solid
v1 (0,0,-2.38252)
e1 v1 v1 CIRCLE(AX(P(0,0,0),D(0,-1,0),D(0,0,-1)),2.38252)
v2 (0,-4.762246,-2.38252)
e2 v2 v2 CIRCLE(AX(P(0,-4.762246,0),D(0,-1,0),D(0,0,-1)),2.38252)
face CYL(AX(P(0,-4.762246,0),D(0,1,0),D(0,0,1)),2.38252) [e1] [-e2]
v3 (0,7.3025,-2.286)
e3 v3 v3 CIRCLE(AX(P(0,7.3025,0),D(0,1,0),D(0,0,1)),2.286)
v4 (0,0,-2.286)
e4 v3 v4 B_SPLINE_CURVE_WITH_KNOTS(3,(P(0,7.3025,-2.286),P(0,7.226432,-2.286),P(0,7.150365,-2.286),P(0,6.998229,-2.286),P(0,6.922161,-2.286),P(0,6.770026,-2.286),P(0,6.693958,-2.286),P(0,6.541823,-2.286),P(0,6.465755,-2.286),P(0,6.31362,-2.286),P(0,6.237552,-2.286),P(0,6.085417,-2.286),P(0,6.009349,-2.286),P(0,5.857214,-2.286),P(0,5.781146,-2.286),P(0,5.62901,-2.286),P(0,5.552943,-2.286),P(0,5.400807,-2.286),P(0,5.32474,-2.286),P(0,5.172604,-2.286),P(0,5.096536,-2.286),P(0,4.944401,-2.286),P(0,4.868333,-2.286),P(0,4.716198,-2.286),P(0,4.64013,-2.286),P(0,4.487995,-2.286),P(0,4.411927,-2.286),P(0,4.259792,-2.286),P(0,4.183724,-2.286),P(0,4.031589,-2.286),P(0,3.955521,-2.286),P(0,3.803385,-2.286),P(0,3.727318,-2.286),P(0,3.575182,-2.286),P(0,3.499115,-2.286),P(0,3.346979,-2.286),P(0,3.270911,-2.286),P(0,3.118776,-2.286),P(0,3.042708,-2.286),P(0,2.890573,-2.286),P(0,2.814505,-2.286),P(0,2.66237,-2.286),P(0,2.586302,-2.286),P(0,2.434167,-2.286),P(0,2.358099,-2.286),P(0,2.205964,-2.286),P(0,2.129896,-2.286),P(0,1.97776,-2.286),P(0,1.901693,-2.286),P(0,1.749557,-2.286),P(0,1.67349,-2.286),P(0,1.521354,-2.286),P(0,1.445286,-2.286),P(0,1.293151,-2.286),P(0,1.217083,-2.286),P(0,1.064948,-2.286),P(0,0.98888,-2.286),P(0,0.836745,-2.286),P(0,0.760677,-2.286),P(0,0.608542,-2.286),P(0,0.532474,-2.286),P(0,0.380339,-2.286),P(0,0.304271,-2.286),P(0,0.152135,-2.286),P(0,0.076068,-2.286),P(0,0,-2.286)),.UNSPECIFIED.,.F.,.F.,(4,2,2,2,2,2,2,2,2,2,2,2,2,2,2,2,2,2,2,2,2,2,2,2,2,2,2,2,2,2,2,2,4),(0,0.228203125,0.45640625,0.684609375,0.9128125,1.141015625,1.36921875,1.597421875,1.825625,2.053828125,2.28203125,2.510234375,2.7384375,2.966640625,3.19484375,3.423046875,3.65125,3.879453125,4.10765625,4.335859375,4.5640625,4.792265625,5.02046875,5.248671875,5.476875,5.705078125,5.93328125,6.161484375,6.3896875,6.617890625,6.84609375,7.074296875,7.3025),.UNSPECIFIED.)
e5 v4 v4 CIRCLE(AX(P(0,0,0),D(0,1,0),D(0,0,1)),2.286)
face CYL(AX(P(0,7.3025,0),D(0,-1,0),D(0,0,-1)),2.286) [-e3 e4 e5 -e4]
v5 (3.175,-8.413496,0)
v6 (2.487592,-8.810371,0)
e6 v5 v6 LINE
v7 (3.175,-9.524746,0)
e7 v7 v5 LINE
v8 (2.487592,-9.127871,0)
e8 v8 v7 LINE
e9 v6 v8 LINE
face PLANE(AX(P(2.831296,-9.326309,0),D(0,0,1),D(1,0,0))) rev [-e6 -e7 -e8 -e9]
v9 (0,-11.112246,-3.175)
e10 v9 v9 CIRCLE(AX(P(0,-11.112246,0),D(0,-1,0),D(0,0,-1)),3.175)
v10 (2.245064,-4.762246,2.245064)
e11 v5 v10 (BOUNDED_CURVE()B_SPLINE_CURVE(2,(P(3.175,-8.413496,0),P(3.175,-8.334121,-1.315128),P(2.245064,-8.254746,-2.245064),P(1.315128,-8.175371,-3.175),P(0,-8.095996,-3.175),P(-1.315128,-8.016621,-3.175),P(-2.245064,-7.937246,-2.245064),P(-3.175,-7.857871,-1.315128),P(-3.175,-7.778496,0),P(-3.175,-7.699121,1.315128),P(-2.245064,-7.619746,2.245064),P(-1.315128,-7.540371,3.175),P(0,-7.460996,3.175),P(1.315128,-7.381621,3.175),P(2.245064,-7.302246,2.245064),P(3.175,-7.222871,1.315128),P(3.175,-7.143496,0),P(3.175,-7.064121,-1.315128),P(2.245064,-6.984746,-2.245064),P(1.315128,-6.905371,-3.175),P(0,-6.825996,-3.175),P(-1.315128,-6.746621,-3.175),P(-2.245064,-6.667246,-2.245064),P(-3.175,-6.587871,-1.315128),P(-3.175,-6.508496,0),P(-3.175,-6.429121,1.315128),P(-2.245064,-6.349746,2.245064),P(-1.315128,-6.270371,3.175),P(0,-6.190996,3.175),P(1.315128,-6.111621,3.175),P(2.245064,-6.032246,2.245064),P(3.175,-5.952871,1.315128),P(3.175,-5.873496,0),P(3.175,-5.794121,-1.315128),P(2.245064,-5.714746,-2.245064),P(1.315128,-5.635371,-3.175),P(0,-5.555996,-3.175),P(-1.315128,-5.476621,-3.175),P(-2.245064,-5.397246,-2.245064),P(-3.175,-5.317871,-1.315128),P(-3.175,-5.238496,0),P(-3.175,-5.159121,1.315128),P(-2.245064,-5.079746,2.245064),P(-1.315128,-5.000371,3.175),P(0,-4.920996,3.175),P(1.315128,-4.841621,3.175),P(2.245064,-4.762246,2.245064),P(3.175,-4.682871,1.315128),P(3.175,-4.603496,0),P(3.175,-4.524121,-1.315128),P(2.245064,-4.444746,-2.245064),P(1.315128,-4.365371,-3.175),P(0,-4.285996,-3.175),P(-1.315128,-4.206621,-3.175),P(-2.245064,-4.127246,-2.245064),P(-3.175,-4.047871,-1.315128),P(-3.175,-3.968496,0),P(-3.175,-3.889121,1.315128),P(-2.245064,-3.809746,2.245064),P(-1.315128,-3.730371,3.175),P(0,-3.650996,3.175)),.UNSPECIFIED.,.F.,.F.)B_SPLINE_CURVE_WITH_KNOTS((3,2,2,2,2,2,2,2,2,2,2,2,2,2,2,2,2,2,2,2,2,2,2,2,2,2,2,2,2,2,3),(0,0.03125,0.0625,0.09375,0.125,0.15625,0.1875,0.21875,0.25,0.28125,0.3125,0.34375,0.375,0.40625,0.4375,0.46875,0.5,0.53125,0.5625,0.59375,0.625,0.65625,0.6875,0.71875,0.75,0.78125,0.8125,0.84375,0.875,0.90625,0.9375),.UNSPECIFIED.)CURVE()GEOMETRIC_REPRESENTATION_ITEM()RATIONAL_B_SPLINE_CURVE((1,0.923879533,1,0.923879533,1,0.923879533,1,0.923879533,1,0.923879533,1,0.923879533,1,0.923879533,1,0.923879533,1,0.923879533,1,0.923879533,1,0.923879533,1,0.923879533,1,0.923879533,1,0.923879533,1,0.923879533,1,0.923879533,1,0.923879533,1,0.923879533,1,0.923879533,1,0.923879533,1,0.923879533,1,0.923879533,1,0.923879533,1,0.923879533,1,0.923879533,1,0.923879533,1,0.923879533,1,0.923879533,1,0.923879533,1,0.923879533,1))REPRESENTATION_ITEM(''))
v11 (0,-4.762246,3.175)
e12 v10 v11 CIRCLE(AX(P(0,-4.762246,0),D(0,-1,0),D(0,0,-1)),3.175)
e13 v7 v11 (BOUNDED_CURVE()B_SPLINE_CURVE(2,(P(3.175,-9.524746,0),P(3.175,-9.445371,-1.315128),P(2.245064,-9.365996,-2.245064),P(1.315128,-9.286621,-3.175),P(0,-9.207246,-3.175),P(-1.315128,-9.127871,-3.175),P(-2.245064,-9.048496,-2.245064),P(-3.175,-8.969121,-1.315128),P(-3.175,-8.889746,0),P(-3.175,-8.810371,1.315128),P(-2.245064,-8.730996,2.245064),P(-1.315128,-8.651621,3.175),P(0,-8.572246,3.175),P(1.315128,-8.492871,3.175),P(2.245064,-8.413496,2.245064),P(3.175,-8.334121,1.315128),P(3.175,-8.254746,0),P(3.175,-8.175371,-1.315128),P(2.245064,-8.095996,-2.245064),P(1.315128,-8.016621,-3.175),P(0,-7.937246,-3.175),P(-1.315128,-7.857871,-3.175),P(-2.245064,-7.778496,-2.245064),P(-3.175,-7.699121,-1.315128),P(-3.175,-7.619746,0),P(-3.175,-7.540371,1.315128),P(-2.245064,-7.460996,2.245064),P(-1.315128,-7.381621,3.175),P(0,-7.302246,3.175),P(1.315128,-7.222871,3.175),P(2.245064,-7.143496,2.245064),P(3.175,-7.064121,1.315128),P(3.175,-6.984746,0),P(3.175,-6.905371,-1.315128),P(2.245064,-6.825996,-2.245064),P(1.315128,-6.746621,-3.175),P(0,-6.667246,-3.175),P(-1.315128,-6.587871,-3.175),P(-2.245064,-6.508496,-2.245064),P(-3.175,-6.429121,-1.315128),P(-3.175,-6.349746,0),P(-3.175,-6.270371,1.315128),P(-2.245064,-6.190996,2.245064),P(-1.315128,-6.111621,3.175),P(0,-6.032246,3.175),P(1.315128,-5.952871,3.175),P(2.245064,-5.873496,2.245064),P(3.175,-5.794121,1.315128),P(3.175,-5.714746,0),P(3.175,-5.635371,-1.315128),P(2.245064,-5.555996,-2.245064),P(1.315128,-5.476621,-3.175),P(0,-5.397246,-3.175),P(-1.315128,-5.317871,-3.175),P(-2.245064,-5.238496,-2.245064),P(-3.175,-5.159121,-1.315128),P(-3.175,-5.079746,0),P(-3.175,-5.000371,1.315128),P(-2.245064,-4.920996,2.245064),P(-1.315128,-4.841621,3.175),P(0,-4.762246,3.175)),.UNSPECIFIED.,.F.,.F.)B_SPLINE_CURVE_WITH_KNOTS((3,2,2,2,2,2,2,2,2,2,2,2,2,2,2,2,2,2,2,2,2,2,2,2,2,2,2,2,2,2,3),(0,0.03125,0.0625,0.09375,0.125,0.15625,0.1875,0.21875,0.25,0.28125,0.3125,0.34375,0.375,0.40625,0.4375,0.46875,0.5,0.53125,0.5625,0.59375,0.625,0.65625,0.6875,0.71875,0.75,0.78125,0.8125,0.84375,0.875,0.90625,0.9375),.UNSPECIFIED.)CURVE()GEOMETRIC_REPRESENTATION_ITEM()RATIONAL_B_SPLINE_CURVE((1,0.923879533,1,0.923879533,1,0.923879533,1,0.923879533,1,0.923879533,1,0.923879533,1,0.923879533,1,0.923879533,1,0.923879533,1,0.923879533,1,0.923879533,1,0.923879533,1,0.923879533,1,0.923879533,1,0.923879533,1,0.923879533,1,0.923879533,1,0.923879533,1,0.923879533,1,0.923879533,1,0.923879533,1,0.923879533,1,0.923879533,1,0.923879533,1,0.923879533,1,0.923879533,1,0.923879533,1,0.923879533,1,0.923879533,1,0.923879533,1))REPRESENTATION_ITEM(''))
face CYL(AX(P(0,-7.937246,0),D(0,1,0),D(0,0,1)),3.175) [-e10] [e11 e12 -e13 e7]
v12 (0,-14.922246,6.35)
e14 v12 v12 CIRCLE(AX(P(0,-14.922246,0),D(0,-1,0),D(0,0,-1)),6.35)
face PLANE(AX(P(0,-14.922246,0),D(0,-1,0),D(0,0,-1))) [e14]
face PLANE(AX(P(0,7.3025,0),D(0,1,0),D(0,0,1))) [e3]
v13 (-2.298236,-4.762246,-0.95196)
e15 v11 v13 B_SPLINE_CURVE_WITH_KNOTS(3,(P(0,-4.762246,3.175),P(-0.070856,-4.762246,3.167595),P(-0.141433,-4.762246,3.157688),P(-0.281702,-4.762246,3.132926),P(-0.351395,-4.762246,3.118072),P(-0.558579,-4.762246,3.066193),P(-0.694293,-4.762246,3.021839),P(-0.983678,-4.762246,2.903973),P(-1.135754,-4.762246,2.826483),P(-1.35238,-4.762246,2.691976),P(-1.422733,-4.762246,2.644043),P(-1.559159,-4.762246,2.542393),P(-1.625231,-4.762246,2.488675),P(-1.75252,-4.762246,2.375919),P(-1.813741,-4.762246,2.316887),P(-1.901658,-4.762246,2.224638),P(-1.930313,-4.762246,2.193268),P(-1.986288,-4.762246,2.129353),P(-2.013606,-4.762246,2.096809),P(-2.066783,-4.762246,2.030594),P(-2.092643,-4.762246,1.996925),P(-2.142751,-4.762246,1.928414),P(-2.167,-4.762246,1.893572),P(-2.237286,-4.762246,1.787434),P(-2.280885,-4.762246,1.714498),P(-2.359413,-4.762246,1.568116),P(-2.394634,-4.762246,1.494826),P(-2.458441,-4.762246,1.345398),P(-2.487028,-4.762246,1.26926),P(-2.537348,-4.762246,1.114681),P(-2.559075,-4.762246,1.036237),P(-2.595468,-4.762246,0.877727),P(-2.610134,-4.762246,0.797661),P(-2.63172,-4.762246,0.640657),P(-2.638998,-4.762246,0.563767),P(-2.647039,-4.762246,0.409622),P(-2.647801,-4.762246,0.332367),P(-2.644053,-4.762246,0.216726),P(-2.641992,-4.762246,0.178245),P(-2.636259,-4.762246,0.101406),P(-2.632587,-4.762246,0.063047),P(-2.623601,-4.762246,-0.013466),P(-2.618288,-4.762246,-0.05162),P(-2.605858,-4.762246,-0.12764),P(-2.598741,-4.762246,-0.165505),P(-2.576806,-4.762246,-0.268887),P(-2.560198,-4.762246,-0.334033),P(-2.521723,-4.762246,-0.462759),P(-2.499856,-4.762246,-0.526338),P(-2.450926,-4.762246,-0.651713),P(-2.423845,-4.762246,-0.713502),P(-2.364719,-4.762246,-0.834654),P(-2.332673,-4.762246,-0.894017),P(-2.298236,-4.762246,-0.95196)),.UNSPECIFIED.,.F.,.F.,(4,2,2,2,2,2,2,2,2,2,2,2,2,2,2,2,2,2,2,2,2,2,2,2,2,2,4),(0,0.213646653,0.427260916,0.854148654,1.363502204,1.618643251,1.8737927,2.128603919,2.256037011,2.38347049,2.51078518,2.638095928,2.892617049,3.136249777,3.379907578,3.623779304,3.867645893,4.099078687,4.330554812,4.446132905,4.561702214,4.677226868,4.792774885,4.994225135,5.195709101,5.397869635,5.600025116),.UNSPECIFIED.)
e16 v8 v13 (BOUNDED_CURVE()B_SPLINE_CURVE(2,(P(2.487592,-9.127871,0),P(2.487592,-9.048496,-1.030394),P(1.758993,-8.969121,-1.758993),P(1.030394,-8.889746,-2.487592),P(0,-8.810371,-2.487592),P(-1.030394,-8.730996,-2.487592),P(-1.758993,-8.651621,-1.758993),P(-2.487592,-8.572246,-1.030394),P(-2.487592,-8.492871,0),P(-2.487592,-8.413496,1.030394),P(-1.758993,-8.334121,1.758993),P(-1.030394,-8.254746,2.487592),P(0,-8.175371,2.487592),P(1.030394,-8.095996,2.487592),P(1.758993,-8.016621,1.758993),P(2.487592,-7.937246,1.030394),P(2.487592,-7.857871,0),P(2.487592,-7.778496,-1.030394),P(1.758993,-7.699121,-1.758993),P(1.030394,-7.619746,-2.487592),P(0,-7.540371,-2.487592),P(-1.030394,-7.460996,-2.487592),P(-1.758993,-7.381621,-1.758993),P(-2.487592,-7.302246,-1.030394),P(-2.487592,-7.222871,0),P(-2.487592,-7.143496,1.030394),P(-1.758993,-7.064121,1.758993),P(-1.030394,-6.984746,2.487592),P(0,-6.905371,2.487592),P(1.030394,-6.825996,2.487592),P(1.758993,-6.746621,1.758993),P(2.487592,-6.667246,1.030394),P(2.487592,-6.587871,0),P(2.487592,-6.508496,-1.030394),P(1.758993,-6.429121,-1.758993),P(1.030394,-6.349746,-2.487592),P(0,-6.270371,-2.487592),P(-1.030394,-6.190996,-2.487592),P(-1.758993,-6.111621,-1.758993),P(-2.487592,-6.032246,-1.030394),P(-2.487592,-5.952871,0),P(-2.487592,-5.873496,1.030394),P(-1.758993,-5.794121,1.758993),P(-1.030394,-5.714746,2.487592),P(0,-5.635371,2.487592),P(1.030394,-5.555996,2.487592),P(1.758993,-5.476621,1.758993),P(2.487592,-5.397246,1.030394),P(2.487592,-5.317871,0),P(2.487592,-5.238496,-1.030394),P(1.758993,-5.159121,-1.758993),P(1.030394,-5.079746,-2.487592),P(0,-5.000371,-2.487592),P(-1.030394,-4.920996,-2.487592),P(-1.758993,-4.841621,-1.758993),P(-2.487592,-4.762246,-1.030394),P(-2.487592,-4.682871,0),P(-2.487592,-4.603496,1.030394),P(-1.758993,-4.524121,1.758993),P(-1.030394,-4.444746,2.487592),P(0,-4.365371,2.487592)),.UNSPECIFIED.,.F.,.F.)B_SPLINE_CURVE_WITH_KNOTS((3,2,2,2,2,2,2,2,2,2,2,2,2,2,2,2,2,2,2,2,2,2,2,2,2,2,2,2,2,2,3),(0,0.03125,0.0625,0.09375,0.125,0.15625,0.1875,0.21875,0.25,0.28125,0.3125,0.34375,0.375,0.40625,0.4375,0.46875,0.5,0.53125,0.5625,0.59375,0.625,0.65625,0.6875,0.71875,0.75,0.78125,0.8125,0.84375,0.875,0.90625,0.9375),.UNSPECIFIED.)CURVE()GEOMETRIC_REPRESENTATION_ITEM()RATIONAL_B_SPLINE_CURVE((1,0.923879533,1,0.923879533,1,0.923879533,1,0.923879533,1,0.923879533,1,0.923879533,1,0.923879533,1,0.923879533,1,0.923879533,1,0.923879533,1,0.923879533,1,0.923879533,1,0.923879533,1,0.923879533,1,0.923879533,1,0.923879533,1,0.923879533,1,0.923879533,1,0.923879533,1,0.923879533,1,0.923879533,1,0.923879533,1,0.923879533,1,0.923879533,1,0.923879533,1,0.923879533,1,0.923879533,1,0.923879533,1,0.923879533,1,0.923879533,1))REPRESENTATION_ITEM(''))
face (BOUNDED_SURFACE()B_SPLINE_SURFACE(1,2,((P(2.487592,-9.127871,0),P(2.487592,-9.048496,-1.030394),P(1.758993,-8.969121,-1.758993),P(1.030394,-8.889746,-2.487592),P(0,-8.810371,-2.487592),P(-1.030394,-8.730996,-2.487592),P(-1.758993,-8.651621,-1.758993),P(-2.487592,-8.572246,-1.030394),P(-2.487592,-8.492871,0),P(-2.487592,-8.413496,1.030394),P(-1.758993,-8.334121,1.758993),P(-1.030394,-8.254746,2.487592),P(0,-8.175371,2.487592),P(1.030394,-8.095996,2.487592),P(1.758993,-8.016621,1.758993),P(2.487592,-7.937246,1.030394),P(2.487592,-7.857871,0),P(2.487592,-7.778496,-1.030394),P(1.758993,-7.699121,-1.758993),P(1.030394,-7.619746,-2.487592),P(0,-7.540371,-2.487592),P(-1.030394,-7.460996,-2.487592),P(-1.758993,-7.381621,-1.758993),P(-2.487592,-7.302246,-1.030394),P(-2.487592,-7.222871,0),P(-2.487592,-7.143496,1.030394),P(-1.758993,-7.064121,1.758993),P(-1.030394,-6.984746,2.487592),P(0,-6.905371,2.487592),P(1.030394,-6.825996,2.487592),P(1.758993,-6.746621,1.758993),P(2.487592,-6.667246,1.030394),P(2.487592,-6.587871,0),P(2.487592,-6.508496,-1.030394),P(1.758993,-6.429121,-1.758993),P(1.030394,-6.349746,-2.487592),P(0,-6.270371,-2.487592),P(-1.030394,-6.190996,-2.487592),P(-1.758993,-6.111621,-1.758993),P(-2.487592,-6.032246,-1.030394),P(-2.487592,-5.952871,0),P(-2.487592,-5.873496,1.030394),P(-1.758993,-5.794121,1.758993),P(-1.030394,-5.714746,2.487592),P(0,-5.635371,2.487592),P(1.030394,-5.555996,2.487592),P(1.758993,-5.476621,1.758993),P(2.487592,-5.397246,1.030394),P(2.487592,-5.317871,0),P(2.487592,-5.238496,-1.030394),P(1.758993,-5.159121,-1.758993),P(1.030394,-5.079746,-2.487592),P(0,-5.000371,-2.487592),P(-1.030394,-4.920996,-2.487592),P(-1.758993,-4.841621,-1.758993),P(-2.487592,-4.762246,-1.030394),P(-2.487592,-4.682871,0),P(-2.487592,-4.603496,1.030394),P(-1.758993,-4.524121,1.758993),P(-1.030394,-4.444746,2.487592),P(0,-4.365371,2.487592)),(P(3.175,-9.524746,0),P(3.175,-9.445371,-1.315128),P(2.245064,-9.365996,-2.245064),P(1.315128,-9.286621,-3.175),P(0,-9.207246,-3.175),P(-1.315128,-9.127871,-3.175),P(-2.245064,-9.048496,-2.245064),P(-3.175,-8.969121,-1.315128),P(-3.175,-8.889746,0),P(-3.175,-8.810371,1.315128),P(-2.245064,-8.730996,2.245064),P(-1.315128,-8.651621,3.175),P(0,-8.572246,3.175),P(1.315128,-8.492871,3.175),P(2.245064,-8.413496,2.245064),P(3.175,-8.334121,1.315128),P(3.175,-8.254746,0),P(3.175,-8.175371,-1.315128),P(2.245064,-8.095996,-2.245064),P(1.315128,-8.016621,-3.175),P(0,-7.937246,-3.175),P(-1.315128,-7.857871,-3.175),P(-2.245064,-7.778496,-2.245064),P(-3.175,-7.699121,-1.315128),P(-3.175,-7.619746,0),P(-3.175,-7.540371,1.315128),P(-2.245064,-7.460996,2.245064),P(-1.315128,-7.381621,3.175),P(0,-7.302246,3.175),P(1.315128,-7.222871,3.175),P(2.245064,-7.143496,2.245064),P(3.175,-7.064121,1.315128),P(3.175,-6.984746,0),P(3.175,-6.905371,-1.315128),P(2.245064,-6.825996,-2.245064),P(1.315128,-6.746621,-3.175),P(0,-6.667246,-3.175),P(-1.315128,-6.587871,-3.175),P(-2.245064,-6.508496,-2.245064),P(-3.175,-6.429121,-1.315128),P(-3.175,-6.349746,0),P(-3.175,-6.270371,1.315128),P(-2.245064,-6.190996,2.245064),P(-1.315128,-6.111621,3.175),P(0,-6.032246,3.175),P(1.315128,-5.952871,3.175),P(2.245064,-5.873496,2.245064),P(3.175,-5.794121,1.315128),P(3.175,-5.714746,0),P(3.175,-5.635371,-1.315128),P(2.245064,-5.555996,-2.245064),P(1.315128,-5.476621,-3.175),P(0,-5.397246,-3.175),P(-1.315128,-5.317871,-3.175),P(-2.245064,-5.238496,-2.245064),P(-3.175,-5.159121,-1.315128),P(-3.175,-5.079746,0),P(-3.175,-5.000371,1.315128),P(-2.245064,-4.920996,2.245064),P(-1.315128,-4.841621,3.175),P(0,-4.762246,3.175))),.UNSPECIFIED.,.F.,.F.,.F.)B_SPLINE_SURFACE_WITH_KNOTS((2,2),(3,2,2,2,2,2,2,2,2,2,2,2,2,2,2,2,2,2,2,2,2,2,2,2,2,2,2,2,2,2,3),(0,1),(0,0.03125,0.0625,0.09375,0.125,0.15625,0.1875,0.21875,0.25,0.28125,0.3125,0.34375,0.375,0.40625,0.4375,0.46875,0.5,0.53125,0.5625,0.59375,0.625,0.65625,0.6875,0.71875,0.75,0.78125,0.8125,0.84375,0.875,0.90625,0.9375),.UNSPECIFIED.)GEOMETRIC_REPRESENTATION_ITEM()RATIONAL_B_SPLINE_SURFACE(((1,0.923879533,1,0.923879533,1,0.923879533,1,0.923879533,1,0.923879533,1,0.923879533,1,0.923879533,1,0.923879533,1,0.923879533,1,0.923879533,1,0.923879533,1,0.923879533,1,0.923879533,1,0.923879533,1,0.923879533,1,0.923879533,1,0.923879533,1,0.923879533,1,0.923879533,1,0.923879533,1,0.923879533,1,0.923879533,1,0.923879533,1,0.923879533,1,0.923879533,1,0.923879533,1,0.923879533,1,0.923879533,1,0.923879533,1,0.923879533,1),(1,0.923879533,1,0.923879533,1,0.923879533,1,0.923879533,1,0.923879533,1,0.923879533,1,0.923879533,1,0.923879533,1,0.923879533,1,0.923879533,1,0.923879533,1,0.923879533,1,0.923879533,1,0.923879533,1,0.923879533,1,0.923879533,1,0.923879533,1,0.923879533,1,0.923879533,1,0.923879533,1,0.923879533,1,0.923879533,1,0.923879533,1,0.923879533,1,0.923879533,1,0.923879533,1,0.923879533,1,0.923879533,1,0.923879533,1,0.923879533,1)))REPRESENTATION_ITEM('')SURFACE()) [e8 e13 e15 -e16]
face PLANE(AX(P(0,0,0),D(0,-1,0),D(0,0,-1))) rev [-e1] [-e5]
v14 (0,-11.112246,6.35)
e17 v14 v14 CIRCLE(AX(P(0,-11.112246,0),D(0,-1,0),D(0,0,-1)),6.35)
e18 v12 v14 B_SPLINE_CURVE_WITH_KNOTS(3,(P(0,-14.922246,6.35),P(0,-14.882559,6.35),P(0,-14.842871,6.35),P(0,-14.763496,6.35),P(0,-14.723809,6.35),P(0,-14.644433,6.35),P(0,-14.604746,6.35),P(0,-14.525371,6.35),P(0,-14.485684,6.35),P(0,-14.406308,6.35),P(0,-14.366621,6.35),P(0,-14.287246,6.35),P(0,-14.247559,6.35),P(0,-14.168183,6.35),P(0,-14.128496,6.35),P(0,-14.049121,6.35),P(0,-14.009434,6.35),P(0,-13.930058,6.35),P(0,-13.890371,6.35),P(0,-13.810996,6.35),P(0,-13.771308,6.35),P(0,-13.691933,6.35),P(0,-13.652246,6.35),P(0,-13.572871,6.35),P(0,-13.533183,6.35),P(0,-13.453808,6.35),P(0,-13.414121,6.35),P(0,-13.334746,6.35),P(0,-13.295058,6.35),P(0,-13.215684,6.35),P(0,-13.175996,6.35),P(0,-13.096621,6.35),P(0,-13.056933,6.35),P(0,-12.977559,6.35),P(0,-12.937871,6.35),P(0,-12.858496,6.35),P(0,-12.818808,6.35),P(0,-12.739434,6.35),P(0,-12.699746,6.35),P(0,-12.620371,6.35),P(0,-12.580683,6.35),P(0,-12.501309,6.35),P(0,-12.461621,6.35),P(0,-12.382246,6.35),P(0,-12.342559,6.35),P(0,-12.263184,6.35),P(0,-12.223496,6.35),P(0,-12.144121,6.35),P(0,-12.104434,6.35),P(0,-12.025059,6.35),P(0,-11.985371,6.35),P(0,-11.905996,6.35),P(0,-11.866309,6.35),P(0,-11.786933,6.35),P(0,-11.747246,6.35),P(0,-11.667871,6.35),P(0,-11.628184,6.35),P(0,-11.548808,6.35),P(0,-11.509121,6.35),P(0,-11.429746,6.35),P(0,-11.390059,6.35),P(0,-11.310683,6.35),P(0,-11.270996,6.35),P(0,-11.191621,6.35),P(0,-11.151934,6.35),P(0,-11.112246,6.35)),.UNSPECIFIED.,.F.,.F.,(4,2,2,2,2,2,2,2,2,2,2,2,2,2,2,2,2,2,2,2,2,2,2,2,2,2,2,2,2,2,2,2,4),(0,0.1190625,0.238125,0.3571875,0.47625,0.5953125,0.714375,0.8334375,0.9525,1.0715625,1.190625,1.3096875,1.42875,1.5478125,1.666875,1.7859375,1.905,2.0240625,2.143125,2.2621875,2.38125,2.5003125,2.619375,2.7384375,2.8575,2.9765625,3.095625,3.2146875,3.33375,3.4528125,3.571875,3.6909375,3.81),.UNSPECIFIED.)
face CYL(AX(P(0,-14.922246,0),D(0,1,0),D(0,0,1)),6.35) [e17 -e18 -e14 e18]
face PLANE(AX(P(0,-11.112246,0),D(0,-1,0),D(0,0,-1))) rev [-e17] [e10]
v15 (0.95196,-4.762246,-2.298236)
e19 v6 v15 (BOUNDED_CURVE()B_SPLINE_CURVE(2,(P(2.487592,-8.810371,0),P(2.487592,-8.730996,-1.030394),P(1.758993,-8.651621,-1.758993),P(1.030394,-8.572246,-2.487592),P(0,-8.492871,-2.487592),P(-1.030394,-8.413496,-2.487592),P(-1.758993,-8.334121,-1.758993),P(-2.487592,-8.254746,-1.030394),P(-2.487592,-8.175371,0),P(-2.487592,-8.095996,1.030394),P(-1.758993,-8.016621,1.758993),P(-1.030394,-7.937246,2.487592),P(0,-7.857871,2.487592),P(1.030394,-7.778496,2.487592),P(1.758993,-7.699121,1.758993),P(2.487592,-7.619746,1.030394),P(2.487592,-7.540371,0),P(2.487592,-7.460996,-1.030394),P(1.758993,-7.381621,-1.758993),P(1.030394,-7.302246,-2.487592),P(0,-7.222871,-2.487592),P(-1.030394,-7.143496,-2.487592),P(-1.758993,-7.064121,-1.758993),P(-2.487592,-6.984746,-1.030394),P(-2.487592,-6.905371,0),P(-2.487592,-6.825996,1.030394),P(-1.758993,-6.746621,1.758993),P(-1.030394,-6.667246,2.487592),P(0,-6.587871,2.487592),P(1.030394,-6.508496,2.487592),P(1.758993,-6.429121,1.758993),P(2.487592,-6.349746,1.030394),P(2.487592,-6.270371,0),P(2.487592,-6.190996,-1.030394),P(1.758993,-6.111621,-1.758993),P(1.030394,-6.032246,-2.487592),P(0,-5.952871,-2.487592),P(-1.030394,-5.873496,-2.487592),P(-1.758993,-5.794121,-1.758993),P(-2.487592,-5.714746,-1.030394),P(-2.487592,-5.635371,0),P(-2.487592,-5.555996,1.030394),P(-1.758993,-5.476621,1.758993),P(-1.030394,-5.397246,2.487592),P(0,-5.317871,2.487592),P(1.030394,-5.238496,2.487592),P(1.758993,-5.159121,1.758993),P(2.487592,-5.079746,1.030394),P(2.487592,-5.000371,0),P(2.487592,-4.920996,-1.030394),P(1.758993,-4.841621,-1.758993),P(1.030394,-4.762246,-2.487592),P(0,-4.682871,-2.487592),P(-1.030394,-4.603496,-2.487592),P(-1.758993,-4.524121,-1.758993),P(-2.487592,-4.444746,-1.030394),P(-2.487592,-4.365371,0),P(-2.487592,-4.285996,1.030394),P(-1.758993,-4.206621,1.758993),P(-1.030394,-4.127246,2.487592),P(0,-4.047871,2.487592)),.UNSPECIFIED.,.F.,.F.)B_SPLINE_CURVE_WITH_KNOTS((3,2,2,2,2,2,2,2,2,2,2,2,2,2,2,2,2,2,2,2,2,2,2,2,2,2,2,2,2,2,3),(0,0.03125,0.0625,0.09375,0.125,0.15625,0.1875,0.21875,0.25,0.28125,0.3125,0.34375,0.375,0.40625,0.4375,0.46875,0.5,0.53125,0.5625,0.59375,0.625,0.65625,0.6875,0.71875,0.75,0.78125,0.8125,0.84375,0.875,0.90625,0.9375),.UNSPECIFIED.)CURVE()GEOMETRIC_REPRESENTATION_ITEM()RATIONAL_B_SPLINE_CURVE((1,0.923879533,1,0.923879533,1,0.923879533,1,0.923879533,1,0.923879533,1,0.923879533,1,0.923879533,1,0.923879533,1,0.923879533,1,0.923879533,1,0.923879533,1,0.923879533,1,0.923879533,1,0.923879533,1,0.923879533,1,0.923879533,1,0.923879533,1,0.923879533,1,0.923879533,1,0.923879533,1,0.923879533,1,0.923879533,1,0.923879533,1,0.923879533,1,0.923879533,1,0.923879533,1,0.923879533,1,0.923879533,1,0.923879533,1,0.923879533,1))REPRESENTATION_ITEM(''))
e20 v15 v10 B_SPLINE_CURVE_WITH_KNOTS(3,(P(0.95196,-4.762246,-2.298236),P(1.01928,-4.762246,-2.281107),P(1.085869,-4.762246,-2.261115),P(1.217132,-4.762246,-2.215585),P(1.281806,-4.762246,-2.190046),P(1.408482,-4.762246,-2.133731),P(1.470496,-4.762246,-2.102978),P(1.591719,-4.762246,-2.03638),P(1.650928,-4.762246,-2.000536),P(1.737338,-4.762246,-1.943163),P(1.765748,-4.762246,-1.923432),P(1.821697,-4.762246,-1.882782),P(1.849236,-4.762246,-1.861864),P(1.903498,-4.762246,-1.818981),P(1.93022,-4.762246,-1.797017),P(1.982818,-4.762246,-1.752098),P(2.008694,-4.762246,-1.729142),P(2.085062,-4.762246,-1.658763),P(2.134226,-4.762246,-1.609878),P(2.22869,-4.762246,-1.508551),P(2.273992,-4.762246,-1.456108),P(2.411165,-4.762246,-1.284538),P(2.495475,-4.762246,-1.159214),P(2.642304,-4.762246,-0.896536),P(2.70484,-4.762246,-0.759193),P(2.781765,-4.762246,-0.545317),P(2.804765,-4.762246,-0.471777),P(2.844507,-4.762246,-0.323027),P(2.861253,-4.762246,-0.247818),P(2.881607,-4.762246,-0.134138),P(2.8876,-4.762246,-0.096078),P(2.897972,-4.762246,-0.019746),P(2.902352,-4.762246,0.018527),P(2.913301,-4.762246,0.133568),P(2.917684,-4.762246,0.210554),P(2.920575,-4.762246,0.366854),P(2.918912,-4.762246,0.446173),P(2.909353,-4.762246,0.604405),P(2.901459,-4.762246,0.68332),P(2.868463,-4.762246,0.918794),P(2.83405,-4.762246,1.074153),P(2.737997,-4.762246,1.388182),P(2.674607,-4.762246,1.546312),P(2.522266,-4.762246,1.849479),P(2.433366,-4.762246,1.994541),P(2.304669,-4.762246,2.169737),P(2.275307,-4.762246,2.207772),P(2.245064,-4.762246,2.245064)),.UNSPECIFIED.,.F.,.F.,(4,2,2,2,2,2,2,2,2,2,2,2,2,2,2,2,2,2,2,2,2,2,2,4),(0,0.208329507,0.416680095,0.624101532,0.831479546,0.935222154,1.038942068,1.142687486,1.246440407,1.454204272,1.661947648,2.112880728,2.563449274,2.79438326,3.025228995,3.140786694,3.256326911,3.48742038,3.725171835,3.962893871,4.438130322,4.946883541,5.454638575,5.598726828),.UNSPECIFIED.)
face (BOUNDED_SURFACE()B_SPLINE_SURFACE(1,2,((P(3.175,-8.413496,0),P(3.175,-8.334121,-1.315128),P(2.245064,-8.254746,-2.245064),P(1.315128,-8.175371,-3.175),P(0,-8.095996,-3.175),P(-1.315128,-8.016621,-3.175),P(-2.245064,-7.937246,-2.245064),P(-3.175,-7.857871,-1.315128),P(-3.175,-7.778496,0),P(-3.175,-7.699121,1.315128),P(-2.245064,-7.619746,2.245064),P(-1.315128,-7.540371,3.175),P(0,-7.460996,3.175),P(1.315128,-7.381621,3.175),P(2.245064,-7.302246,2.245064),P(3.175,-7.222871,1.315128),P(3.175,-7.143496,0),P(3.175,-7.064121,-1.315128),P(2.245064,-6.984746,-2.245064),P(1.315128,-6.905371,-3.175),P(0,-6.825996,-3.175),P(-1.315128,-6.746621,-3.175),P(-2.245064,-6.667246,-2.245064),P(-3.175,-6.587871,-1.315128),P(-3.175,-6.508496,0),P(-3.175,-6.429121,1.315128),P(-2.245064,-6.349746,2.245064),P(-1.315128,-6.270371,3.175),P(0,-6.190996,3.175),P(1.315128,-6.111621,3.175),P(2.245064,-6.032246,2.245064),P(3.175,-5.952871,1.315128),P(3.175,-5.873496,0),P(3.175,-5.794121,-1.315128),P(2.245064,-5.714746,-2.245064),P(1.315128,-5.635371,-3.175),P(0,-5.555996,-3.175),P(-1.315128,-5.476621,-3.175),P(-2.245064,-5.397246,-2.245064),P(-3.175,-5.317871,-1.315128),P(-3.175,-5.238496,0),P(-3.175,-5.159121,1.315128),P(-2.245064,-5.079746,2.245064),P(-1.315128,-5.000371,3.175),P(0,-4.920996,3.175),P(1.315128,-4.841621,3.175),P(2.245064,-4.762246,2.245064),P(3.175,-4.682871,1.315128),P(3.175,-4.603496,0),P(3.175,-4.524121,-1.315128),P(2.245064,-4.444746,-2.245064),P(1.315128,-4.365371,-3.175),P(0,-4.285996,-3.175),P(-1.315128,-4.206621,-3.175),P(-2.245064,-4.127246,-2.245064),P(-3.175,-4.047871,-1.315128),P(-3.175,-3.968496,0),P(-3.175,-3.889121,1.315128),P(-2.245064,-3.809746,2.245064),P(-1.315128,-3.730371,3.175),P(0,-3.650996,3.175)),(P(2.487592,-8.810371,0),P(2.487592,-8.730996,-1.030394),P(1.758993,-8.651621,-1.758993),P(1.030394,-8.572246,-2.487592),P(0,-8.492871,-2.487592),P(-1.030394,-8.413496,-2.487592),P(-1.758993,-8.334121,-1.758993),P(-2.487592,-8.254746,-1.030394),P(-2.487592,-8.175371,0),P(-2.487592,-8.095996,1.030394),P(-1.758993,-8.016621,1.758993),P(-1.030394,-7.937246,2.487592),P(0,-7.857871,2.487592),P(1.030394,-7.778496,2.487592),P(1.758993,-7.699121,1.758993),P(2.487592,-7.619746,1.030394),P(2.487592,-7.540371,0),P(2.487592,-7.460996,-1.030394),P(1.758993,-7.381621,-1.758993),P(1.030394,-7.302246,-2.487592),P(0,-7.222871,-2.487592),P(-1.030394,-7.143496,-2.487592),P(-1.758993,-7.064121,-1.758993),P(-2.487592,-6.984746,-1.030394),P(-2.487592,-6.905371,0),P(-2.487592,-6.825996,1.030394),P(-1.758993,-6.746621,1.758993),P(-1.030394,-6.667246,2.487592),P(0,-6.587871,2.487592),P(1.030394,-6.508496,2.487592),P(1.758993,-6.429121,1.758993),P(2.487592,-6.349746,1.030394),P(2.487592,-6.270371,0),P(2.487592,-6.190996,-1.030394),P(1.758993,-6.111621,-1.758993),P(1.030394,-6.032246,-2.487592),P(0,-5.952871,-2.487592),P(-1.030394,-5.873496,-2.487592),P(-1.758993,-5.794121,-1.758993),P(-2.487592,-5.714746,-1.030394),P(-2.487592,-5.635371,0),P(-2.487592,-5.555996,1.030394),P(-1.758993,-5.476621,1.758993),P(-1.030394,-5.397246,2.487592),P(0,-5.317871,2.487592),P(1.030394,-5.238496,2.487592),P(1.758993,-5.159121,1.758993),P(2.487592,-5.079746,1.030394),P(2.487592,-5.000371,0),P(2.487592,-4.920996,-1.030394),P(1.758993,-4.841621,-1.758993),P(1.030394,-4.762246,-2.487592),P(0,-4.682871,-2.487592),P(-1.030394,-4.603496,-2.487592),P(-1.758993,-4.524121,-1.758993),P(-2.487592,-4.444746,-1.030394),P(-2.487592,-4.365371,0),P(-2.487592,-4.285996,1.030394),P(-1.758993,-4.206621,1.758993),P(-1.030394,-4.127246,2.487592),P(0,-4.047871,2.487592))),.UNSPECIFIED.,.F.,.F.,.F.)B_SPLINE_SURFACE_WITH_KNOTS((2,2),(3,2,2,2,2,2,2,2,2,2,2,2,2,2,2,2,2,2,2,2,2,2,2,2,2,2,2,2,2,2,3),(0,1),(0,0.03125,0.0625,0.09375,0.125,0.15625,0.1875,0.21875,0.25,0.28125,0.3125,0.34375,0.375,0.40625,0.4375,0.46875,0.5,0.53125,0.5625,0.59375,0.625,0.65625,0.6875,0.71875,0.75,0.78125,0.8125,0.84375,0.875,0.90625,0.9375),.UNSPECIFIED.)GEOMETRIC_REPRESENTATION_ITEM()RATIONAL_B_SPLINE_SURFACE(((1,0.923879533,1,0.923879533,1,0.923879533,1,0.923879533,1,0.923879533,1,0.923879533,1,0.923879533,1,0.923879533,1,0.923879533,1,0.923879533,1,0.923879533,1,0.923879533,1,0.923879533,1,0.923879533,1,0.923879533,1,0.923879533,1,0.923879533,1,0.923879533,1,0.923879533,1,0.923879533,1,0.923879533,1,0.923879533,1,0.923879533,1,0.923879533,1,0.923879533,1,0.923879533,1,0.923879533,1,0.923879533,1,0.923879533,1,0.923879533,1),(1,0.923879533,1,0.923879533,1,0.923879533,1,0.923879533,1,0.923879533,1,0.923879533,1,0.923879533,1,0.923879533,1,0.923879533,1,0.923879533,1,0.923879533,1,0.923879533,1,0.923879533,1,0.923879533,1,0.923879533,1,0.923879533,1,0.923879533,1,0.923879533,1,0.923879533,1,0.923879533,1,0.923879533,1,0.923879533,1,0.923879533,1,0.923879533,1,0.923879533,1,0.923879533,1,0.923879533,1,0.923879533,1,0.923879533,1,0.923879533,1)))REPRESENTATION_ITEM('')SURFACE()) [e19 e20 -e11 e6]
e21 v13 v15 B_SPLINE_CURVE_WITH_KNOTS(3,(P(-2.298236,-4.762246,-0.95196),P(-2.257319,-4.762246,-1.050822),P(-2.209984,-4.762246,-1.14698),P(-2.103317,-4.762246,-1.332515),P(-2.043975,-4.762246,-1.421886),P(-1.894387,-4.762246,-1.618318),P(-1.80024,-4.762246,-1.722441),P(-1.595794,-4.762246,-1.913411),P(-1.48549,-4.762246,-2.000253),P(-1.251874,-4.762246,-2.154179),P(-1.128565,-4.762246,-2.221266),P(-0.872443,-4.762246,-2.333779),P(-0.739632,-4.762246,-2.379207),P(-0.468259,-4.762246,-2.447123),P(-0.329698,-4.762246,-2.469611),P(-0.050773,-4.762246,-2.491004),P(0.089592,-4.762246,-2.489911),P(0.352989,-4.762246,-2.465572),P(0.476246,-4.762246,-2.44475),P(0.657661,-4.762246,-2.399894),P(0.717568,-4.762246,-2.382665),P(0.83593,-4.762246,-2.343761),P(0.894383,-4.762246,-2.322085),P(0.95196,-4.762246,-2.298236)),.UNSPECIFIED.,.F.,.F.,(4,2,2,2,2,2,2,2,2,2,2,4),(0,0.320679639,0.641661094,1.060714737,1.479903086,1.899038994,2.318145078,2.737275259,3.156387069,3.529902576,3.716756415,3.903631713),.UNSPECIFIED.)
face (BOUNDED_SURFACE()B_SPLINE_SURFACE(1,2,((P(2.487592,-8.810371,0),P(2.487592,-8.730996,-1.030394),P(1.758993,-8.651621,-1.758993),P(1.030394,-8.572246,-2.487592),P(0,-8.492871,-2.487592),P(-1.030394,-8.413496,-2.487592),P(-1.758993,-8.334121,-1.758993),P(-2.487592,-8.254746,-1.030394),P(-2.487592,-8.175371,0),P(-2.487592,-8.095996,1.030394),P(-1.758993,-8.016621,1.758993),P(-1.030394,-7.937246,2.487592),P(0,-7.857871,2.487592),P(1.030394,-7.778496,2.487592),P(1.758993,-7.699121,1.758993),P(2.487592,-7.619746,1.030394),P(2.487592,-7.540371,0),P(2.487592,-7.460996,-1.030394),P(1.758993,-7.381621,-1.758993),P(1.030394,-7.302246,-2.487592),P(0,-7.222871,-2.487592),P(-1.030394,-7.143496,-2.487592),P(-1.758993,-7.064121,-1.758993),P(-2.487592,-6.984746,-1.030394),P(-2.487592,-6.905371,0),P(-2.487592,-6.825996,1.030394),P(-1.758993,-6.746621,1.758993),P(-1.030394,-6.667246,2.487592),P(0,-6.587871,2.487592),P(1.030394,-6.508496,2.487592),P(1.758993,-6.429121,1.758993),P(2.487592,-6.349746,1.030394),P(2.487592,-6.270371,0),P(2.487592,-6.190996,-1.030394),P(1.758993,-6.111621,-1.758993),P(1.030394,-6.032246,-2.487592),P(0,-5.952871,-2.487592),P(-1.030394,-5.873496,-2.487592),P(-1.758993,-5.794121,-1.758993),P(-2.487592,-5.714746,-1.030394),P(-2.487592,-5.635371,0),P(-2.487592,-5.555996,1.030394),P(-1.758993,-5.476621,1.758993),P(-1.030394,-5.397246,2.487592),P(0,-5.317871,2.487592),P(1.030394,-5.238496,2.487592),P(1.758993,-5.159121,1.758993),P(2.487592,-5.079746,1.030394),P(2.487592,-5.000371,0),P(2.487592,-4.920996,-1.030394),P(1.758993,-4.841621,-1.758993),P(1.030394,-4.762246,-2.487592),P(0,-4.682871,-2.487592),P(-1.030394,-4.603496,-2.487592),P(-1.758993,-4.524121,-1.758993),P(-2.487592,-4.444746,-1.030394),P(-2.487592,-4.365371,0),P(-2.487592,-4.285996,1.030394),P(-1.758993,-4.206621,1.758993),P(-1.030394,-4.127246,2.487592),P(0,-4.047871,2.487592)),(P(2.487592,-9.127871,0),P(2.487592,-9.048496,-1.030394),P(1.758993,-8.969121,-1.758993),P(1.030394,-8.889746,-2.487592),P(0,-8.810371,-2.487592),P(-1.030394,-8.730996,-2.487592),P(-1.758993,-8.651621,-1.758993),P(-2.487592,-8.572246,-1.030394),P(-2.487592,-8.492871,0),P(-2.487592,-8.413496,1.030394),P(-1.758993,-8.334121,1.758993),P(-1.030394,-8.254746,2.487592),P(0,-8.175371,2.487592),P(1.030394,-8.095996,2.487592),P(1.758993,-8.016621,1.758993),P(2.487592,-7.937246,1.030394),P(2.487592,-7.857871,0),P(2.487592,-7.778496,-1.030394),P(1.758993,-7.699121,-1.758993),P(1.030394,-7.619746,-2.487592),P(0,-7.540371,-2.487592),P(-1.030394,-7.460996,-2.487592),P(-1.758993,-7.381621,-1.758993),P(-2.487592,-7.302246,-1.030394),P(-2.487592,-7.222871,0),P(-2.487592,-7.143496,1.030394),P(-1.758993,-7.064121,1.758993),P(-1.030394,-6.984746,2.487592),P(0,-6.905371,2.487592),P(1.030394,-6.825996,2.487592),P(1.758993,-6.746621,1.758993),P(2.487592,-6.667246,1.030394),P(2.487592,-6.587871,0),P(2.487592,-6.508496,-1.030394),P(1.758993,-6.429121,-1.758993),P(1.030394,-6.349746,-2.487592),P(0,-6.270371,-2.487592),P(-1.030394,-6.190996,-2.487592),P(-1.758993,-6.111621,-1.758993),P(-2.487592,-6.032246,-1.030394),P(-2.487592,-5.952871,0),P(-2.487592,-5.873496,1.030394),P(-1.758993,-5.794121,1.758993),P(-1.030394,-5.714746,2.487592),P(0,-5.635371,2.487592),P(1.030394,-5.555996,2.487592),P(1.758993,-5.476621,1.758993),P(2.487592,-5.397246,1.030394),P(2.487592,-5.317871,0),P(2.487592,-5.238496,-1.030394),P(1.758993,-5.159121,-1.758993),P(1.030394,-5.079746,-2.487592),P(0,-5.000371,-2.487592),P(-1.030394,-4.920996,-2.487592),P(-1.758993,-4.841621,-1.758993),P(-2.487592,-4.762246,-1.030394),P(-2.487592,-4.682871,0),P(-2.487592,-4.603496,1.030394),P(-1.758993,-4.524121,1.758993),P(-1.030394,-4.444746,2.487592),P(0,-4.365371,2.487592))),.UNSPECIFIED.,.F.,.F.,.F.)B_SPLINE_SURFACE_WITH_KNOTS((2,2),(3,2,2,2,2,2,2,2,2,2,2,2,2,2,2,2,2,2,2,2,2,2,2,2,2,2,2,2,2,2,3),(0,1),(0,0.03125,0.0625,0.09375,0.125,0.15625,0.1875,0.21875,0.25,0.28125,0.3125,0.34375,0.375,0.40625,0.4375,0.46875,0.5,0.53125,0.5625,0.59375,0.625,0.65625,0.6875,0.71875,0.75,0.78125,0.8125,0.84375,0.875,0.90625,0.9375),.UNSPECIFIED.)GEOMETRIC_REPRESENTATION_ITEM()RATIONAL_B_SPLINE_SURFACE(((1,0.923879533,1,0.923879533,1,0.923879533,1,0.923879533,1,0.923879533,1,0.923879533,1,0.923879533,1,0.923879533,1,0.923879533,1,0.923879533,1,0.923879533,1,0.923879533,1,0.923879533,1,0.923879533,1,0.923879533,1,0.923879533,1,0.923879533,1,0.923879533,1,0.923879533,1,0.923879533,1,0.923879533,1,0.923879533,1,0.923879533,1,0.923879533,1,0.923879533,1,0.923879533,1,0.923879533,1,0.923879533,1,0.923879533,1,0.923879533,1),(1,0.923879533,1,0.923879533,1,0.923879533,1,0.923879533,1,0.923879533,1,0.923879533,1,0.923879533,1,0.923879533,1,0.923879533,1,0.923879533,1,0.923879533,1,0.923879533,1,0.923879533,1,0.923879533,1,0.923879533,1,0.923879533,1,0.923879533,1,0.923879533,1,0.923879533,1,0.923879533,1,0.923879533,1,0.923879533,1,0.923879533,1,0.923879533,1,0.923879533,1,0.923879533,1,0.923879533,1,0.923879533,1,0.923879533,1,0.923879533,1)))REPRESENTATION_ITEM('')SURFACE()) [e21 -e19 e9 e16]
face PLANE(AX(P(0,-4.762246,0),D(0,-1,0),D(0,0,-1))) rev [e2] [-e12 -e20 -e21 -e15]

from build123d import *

# Parameters (mm, degrees)
SKETCH1_R           = 2.286
BOSS_EXTRUDE1_DEPTH = 7.3025
SKETCH2_R           = 2.38252
BOSS_EXTRUDE2_DEPTH = 4.762246
SKETCH3_R           = 3.175
BOSS_EXTRUDE3_DEPTH = 3.175
SKETCH4_R           = 3.175
BOSS_EXTRUDE4_DEPTH = 3.175
THREAD2_PITCH       = 1.27
SKETCH11_R          = 6.35
BOSS_EXTRUDE5_DEPTH = 3.81


with BuildPart() as part:
    # Sketch1 → Boss-Extrude1 (new body)
    with BuildSketch(Plane(origin=(0, 0, 0), x_dir=(1, 0, 0), z_dir=(0, 1, 0))):
        with Locations(Location((0, 0, 0), (0, 0, 90))):
            Circle(SKETCH1_R)
    extrude(amount=BOSS_EXTRUDE1_DEPTH)

    # Sketch2 → Boss-Extrude2 (add)
    with BuildSketch(Plane(origin=(0, 0, 0), x_dir=(-1, 0, 0), z_dir=(0, -1, 0))):
        with Locations(Location((0, 0, 0), (0, 0, 90))):
            Circle(SKETCH2_R)
    extrude(amount=BOSS_EXTRUDE2_DEPTH)

    # Sketch3 → Boss-Extrude3 (add)
    with BuildSketch(Plane(origin=(0, -4.762246, 0), x_dir=(-1, 0, 0), z_dir=(0, -1, 0))):
        with Locations(Location((0, 0, 0), (0, 0, 90))):
            Circle(SKETCH3_R)
    extrude(amount=BOSS_EXTRUDE3_DEPTH)

    # Sketch4 → Boss-Extrude4 (add)
    with BuildSketch(Plane(origin=(0, -7.937246, 0), x_dir=(-1, 0, 0), z_dir=(0, -1, 0))):
        with Locations(Location((0, 0, 0), (0, 0, 90))):
            Circle(SKETCH4_R)
    extrude(amount=BOSS_EXTRUDE4_DEPTH)

    # Thread2: the profile of Thread Profile3 profile screwed along a right-hand helix of 3.75 turns, 8 arcs to a turn; built about Z, then put on its axis
    thread2_z = Axis((0, 0, 0), (0, 0, 1))
    thread2_corners = [(3.1753, 0, -0.000173205), (3.1753, 0, 1.111423202), (2.487592339, 0, 0.714374998), (2.487592339, 0, 0.396874998)]
    with BuildLine(mode=Mode.PRIVATE) as thread2_profile:
        Line(thread2_corners[0], thread2_corners[1])
        Line(thread2_corners[1], thread2_corners[2])
        Line(thread2_corners[2], thread2_corners[3])
        Line(thread2_corners[3], thread2_corners[0])
    thread2_cap = Face(thread2_profile.wire())
    thread2_turn_angles = [0, 22.5, 45, 67.5, 90, 112.5, 135, 157.5, 180, 202.5, 225, 247.5, 270, 292.5, 315, 337.5, 360]
    thread2_turn_weights = [1, 0.9238795325112867, 1, 0.9238795325112867, 1, 0.9238795325112867, 1, 0.9238795325112867, 1, 0.9238795325112867, 1, 0.9238795325112867, 1, 0.9238795325112867, 1, 0.9238795325112867, 1]
    thread2_turn_rails = [Edge.make_bspline([Vector(p[0], p[1], 0).rotate(thread2_z, thread2_turn_angles[k]) / thread2_turn_weights[k] + Vector(0, 0, p[2] + THREAD2_PITCH * thread2_turn_angles[k] / 360) for k in range(17)], [0, 0, 0, 1, 1, 2, 2, 3, 3, 4, 4, 5, 5, 6, 6, 7, 7, 8, 8, 8], 2, thread2_turn_weights) for p in thread2_corners]
    thread2_turn_sides = [Face.make_surface_from_curves(thread2_turn_rails[p[0]], thread2_turn_rails[p[1]]) for p in [(0, 1), (1, 2), (2, 3), (3, 0)]]
    thread2_last_angles = [1080, 1102.5, 1125, 1147.5, 1170, 1192.5, 1215, 1237.5, 1260, 1282.5, 1305, 1327.5, 1350]
    thread2_last_weights = [1, 0.9238795325112867, 1, 0.9238795325112867, 1, 0.9238795325112867, 1, 0.9238795325112867, 1, 0.9238795325112867, 1, 0.9238795325112883, 1]
    thread2_last_rails = [Edge.make_bspline([Vector(p[0], p[1], 0).rotate(thread2_z, thread2_last_angles[k]) / thread2_last_weights[k] + Vector(0, 0, p[2] + THREAD2_PITCH * thread2_last_angles[k] / 360) for k in range(13)], [0, 0, 0, 1, 1, 2, 2, 3, 3, 4, 4, 5, 5, 6, 6, 6], 2, thread2_last_weights) for p in thread2_corners]
    thread2_last_sides = [Face.make_surface_from_curves(thread2_last_rails[p[0]], thread2_last_rails[p[1]]) for p in [(0, 1), (1, 2), (2, 3), (3, 0)]]
    thread2 = Plane(origin=(0, -9.524746, 0), x_dir=(1, 0, 0), z_dir=(0, 1, 0)) * Solid(Shell([*[p.moved(Location((0, 0, THREAD2_PITCH * i))) for i in range(3) for p in thread2_turn_sides], *thread2_last_sides, thread2_cap, thread2_cap.rotate(thread2_z, 1350).moved(Location((0, 0, THREAD2_PITCH * 1350 / 360)))]))
    add(thread2, mode=Mode.SUBTRACT)

    # Sketch11 → Boss-Extrude5 (add)
    with BuildSketch(Plane(origin=(0, -11.112246, 0), x_dir=(-1, 0, 0), z_dir=(0, -1, 0))):
        with Locations(Location((0, 0, 0), (0, 0, 270))):
            Circle(SKETCH11_R)
    extrude(amount=BOSS_EXTRUDE5_DEPTH)


solid = part.part
